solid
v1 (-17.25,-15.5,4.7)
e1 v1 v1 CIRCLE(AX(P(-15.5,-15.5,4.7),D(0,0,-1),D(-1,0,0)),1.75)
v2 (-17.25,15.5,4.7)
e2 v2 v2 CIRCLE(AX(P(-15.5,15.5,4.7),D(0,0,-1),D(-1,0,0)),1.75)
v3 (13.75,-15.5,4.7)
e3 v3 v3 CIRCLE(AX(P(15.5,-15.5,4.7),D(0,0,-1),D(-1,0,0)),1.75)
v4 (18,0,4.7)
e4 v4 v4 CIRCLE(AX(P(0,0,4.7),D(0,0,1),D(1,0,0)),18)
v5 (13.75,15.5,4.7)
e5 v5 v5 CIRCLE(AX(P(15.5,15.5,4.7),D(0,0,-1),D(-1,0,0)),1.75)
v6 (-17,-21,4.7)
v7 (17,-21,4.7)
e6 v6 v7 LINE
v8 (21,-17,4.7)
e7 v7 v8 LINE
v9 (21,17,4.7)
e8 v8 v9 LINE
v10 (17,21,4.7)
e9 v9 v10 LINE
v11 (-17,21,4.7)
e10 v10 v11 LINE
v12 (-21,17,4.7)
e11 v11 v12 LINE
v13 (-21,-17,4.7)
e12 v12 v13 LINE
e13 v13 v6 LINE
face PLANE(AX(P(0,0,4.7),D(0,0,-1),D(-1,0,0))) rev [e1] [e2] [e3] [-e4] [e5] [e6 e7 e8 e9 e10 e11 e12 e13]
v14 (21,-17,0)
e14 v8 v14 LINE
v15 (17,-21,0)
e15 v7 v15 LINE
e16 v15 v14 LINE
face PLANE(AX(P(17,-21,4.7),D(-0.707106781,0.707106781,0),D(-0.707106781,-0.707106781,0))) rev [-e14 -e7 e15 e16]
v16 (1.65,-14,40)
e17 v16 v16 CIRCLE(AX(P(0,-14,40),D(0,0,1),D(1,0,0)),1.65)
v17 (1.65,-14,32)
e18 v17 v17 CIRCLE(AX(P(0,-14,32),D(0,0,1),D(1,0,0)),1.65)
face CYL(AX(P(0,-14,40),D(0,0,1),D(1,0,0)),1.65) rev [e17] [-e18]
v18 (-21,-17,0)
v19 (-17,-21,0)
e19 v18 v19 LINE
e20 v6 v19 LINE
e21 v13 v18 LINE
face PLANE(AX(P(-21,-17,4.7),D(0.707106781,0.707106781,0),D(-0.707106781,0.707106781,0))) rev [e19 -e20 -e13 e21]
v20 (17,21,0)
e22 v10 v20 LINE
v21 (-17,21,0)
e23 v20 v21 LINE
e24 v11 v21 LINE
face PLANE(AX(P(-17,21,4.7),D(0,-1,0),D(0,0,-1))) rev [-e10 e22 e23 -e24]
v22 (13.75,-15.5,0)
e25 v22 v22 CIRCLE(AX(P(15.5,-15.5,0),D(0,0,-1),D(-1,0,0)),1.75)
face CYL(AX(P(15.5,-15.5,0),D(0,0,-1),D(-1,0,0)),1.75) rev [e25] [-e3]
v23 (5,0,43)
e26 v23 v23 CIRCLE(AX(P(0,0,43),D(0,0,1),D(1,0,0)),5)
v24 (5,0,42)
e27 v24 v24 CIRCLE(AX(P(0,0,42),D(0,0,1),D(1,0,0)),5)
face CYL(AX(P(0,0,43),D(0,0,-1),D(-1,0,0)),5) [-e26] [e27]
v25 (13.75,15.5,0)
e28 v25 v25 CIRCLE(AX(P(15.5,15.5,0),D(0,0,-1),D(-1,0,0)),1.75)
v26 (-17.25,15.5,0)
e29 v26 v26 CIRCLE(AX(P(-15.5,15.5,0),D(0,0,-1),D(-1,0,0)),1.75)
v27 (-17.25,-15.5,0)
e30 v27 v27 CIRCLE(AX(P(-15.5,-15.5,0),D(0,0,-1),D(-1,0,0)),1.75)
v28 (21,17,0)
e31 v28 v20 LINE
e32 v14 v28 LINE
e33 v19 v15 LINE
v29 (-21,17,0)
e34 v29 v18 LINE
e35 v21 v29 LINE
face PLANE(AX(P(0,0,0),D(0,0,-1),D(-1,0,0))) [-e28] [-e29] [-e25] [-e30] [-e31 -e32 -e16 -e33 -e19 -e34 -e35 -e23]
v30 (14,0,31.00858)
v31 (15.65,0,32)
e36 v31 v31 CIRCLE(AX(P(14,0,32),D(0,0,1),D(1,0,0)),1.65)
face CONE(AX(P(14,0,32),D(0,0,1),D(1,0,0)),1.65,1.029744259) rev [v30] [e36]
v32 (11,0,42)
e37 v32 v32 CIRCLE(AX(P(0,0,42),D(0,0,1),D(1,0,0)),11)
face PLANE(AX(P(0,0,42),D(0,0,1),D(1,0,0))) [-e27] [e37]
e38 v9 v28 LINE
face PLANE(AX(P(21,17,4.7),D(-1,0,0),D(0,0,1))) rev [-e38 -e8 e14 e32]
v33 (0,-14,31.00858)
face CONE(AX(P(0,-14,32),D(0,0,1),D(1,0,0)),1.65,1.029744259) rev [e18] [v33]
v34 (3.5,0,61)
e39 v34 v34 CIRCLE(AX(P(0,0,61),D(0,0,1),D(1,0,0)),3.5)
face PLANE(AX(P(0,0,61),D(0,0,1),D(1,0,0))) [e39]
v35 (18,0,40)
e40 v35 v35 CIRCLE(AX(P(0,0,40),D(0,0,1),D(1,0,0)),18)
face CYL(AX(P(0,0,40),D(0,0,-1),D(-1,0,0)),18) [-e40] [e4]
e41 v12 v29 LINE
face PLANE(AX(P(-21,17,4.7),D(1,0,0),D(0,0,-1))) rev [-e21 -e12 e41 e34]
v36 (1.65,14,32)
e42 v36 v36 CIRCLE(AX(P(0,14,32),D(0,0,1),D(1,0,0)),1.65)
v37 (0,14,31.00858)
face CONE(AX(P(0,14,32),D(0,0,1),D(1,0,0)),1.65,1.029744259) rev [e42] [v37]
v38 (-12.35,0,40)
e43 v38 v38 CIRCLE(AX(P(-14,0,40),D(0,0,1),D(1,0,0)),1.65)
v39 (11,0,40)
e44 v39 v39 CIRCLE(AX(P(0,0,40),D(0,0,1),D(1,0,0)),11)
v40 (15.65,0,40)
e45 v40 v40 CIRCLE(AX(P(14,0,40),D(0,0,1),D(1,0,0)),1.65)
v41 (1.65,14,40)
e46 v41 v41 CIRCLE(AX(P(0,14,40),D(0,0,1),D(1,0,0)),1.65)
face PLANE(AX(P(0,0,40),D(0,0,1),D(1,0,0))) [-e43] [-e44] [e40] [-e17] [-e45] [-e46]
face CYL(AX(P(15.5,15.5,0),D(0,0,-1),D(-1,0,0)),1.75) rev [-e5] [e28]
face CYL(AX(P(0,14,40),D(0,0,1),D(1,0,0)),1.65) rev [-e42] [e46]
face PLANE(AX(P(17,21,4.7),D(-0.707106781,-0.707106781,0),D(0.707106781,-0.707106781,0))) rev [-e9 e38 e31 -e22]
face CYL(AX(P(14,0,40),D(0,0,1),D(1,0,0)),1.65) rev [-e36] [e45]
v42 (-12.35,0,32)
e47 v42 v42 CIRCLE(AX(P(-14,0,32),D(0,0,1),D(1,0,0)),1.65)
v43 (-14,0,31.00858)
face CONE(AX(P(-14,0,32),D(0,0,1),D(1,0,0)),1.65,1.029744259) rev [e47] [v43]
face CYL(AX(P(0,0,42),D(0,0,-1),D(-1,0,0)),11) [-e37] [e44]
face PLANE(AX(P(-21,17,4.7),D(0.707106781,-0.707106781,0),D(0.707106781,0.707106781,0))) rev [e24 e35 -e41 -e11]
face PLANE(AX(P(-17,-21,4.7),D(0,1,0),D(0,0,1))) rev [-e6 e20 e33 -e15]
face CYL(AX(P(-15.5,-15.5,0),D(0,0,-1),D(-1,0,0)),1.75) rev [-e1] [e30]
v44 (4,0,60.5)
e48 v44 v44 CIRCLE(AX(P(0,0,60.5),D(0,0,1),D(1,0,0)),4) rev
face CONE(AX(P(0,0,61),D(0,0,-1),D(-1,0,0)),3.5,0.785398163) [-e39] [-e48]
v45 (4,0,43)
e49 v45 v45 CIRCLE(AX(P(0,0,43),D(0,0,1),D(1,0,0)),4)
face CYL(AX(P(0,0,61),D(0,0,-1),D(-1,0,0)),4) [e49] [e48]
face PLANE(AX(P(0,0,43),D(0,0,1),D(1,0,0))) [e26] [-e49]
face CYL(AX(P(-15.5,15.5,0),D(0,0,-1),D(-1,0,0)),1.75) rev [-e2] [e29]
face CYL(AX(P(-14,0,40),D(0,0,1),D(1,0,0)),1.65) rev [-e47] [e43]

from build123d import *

# Parameters (mm, degrees)
BOSS_EXTRUDE1_DEPTH                = 4.7
SKETCH2_R                          = 18
BOSS_EXTRUDE2_DEPTH                = 35.3
F_3_5_3_5_DIAMETER_HOLE1_OUTLINE_R = 1.75
F_3_5_3_5_DIAMETER_HOLE1_DEPTH     = 4.7
SKETCH9_R                          = 11
BOSS_EXTRUDE3_DEPTH                = 2
SKETCH10_R                         = 5
BOSS_EXTRUDE4_DEPTH                = 1
SKETCH11_R                         = 4
BOSS_EXTRUDE5_DEPTH                = 18
CHAMFER1_SIZE                      = 0.5


# Read off the part's stored shape, not the designer's step: Ø3.5 (3.5) Diameter Hole1, Tap Drill for M4x0.7 Tap1
with BuildPart() as part:
    # Sketch1 → Boss-Extrude1 (new body)
    with BuildSketch(Plane.XY):
        Polygon((-21, 17), (-17, 21), (17, 21), (21, 17), (21, -17), (17, -21), (-17, -21), (-21, -17), align=None)
    extrude(amount=BOSS_EXTRUDE1_DEPTH)

    # Sketch2 → Boss-Extrude2 (add)
    with BuildSketch(Plane.XY.offset(4.7)):
        Circle(SKETCH2_R)
    extrude(amount=BOSS_EXTRUDE2_DEPTH)

    # Ø3.5 (3.5) Diameter Hole1 outline → Ø3.5 (3.5) Diameter Hole1 (cut)
    with BuildSketch(Plane.XY):
        with Locations((-15.5, 15.5)):
            Circle(F_3_5_3_5_DIAMETER_HOLE1_OUTLINE_R)
        with Locations((15.5, -15.5)):
            Circle(F_3_5_3_5_DIAMETER_HOLE1_OUTLINE_R)
        with Locations((15.5, 15.5)):
            Circle(F_3_5_3_5_DIAMETER_HOLE1_OUTLINE_R)
        with Locations((-15.5, -15.5)):
            Circle(F_3_5_3_5_DIAMETER_HOLE1_OUTLINE_R)
    extrude(amount=F_3_5_3_5_DIAMETER_HOLE1_DEPTH, mode=Mode.SUBTRACT)

    # Tap Drill for M4x0.7 Tap1 outline → Tap Drill for M4x0.7 Tap1 (revolve, cut)
    with BuildSketch(Plane(origin=(14, 0, 0), x_dir=(1, 0, 0), z_dir=(0, -1, 0))):
        Polygon((0, 40), (0, 31.008579979), (1.65, 32), (1.65, 40), align=None)
    revolve(axis=Axis((14, 0, 0), (0, 0, 1)), mode=Mode.SUBTRACT)

    # Tap Drill for M4x0.7 Tap1 2 outline → Tap Drill for M4x0.7 Tap1 2 (revolve, cut)
    with BuildSketch(Plane(origin=(-14, 0, 0), x_dir=(1, 0, 0), z_dir=(0, -1, 0))):
        Polygon((0, 40), (0, 31.008579979), (1.65, 32), (1.65, 40), align=None)
    revolve(axis=Axis((-14, 0, 0), (0, 0, 1)), mode=Mode.SUBTRACT)

    # Tap Drill for M4x0.7 Tap1 3 outline → Tap Drill for M4x0.7 Tap1 3 (revolve, cut)
    with BuildSketch(Plane.XZ.offset(14)):
        Polygon((0, 40), (0, 31.008579979), (1.65, 32), (1.65, 40), align=None)
    revolve(axis=Axis((0, -14, 0), (0, 0, 1)), mode=Mode.SUBTRACT)

    # Tap Drill for M4x0.7 Tap1 4 outline → Tap Drill for M4x0.7 Tap1 4 (revolve, cut)
    with BuildSketch(Plane.XZ.offset(-14)):
        Polygon((0, 40), (0, 31.008579979), (1.65, 32), (1.65, 40), align=None)
    revolve(axis=Axis((0, 14, 0), (0, 0, 1)), mode=Mode.SUBTRACT)

    # Sketch9 → Boss-Extrude3 (add)
    with BuildSketch(Plane.XY.offset(40)):
        Circle(SKETCH9_R)
    extrude(amount=BOSS_EXTRUDE3_DEPTH)

    # Sketch10 → Boss-Extrude4 (add)
    with BuildSketch(Plane.XY.offset(42)):
        Circle(SKETCH10_R)
    extrude(amount=BOSS_EXTRUDE4_DEPTH)

    # Sketch11 → Boss-Extrude5 (add)
    with BuildSketch(Plane.XY.offset(43)):
        Circle(SKETCH11_R)
    extrude(amount=BOSS_EXTRUDE5_DEPTH)

    # Chamfer1
    chamfer1_edges = [part.edges().sort_by_distance(p)[0] for p in [
        (-4, 0, 61),
    ]]
    chamfer(chamfer1_edges, length=CHAMFER1_SIZE)


solid = part.part
